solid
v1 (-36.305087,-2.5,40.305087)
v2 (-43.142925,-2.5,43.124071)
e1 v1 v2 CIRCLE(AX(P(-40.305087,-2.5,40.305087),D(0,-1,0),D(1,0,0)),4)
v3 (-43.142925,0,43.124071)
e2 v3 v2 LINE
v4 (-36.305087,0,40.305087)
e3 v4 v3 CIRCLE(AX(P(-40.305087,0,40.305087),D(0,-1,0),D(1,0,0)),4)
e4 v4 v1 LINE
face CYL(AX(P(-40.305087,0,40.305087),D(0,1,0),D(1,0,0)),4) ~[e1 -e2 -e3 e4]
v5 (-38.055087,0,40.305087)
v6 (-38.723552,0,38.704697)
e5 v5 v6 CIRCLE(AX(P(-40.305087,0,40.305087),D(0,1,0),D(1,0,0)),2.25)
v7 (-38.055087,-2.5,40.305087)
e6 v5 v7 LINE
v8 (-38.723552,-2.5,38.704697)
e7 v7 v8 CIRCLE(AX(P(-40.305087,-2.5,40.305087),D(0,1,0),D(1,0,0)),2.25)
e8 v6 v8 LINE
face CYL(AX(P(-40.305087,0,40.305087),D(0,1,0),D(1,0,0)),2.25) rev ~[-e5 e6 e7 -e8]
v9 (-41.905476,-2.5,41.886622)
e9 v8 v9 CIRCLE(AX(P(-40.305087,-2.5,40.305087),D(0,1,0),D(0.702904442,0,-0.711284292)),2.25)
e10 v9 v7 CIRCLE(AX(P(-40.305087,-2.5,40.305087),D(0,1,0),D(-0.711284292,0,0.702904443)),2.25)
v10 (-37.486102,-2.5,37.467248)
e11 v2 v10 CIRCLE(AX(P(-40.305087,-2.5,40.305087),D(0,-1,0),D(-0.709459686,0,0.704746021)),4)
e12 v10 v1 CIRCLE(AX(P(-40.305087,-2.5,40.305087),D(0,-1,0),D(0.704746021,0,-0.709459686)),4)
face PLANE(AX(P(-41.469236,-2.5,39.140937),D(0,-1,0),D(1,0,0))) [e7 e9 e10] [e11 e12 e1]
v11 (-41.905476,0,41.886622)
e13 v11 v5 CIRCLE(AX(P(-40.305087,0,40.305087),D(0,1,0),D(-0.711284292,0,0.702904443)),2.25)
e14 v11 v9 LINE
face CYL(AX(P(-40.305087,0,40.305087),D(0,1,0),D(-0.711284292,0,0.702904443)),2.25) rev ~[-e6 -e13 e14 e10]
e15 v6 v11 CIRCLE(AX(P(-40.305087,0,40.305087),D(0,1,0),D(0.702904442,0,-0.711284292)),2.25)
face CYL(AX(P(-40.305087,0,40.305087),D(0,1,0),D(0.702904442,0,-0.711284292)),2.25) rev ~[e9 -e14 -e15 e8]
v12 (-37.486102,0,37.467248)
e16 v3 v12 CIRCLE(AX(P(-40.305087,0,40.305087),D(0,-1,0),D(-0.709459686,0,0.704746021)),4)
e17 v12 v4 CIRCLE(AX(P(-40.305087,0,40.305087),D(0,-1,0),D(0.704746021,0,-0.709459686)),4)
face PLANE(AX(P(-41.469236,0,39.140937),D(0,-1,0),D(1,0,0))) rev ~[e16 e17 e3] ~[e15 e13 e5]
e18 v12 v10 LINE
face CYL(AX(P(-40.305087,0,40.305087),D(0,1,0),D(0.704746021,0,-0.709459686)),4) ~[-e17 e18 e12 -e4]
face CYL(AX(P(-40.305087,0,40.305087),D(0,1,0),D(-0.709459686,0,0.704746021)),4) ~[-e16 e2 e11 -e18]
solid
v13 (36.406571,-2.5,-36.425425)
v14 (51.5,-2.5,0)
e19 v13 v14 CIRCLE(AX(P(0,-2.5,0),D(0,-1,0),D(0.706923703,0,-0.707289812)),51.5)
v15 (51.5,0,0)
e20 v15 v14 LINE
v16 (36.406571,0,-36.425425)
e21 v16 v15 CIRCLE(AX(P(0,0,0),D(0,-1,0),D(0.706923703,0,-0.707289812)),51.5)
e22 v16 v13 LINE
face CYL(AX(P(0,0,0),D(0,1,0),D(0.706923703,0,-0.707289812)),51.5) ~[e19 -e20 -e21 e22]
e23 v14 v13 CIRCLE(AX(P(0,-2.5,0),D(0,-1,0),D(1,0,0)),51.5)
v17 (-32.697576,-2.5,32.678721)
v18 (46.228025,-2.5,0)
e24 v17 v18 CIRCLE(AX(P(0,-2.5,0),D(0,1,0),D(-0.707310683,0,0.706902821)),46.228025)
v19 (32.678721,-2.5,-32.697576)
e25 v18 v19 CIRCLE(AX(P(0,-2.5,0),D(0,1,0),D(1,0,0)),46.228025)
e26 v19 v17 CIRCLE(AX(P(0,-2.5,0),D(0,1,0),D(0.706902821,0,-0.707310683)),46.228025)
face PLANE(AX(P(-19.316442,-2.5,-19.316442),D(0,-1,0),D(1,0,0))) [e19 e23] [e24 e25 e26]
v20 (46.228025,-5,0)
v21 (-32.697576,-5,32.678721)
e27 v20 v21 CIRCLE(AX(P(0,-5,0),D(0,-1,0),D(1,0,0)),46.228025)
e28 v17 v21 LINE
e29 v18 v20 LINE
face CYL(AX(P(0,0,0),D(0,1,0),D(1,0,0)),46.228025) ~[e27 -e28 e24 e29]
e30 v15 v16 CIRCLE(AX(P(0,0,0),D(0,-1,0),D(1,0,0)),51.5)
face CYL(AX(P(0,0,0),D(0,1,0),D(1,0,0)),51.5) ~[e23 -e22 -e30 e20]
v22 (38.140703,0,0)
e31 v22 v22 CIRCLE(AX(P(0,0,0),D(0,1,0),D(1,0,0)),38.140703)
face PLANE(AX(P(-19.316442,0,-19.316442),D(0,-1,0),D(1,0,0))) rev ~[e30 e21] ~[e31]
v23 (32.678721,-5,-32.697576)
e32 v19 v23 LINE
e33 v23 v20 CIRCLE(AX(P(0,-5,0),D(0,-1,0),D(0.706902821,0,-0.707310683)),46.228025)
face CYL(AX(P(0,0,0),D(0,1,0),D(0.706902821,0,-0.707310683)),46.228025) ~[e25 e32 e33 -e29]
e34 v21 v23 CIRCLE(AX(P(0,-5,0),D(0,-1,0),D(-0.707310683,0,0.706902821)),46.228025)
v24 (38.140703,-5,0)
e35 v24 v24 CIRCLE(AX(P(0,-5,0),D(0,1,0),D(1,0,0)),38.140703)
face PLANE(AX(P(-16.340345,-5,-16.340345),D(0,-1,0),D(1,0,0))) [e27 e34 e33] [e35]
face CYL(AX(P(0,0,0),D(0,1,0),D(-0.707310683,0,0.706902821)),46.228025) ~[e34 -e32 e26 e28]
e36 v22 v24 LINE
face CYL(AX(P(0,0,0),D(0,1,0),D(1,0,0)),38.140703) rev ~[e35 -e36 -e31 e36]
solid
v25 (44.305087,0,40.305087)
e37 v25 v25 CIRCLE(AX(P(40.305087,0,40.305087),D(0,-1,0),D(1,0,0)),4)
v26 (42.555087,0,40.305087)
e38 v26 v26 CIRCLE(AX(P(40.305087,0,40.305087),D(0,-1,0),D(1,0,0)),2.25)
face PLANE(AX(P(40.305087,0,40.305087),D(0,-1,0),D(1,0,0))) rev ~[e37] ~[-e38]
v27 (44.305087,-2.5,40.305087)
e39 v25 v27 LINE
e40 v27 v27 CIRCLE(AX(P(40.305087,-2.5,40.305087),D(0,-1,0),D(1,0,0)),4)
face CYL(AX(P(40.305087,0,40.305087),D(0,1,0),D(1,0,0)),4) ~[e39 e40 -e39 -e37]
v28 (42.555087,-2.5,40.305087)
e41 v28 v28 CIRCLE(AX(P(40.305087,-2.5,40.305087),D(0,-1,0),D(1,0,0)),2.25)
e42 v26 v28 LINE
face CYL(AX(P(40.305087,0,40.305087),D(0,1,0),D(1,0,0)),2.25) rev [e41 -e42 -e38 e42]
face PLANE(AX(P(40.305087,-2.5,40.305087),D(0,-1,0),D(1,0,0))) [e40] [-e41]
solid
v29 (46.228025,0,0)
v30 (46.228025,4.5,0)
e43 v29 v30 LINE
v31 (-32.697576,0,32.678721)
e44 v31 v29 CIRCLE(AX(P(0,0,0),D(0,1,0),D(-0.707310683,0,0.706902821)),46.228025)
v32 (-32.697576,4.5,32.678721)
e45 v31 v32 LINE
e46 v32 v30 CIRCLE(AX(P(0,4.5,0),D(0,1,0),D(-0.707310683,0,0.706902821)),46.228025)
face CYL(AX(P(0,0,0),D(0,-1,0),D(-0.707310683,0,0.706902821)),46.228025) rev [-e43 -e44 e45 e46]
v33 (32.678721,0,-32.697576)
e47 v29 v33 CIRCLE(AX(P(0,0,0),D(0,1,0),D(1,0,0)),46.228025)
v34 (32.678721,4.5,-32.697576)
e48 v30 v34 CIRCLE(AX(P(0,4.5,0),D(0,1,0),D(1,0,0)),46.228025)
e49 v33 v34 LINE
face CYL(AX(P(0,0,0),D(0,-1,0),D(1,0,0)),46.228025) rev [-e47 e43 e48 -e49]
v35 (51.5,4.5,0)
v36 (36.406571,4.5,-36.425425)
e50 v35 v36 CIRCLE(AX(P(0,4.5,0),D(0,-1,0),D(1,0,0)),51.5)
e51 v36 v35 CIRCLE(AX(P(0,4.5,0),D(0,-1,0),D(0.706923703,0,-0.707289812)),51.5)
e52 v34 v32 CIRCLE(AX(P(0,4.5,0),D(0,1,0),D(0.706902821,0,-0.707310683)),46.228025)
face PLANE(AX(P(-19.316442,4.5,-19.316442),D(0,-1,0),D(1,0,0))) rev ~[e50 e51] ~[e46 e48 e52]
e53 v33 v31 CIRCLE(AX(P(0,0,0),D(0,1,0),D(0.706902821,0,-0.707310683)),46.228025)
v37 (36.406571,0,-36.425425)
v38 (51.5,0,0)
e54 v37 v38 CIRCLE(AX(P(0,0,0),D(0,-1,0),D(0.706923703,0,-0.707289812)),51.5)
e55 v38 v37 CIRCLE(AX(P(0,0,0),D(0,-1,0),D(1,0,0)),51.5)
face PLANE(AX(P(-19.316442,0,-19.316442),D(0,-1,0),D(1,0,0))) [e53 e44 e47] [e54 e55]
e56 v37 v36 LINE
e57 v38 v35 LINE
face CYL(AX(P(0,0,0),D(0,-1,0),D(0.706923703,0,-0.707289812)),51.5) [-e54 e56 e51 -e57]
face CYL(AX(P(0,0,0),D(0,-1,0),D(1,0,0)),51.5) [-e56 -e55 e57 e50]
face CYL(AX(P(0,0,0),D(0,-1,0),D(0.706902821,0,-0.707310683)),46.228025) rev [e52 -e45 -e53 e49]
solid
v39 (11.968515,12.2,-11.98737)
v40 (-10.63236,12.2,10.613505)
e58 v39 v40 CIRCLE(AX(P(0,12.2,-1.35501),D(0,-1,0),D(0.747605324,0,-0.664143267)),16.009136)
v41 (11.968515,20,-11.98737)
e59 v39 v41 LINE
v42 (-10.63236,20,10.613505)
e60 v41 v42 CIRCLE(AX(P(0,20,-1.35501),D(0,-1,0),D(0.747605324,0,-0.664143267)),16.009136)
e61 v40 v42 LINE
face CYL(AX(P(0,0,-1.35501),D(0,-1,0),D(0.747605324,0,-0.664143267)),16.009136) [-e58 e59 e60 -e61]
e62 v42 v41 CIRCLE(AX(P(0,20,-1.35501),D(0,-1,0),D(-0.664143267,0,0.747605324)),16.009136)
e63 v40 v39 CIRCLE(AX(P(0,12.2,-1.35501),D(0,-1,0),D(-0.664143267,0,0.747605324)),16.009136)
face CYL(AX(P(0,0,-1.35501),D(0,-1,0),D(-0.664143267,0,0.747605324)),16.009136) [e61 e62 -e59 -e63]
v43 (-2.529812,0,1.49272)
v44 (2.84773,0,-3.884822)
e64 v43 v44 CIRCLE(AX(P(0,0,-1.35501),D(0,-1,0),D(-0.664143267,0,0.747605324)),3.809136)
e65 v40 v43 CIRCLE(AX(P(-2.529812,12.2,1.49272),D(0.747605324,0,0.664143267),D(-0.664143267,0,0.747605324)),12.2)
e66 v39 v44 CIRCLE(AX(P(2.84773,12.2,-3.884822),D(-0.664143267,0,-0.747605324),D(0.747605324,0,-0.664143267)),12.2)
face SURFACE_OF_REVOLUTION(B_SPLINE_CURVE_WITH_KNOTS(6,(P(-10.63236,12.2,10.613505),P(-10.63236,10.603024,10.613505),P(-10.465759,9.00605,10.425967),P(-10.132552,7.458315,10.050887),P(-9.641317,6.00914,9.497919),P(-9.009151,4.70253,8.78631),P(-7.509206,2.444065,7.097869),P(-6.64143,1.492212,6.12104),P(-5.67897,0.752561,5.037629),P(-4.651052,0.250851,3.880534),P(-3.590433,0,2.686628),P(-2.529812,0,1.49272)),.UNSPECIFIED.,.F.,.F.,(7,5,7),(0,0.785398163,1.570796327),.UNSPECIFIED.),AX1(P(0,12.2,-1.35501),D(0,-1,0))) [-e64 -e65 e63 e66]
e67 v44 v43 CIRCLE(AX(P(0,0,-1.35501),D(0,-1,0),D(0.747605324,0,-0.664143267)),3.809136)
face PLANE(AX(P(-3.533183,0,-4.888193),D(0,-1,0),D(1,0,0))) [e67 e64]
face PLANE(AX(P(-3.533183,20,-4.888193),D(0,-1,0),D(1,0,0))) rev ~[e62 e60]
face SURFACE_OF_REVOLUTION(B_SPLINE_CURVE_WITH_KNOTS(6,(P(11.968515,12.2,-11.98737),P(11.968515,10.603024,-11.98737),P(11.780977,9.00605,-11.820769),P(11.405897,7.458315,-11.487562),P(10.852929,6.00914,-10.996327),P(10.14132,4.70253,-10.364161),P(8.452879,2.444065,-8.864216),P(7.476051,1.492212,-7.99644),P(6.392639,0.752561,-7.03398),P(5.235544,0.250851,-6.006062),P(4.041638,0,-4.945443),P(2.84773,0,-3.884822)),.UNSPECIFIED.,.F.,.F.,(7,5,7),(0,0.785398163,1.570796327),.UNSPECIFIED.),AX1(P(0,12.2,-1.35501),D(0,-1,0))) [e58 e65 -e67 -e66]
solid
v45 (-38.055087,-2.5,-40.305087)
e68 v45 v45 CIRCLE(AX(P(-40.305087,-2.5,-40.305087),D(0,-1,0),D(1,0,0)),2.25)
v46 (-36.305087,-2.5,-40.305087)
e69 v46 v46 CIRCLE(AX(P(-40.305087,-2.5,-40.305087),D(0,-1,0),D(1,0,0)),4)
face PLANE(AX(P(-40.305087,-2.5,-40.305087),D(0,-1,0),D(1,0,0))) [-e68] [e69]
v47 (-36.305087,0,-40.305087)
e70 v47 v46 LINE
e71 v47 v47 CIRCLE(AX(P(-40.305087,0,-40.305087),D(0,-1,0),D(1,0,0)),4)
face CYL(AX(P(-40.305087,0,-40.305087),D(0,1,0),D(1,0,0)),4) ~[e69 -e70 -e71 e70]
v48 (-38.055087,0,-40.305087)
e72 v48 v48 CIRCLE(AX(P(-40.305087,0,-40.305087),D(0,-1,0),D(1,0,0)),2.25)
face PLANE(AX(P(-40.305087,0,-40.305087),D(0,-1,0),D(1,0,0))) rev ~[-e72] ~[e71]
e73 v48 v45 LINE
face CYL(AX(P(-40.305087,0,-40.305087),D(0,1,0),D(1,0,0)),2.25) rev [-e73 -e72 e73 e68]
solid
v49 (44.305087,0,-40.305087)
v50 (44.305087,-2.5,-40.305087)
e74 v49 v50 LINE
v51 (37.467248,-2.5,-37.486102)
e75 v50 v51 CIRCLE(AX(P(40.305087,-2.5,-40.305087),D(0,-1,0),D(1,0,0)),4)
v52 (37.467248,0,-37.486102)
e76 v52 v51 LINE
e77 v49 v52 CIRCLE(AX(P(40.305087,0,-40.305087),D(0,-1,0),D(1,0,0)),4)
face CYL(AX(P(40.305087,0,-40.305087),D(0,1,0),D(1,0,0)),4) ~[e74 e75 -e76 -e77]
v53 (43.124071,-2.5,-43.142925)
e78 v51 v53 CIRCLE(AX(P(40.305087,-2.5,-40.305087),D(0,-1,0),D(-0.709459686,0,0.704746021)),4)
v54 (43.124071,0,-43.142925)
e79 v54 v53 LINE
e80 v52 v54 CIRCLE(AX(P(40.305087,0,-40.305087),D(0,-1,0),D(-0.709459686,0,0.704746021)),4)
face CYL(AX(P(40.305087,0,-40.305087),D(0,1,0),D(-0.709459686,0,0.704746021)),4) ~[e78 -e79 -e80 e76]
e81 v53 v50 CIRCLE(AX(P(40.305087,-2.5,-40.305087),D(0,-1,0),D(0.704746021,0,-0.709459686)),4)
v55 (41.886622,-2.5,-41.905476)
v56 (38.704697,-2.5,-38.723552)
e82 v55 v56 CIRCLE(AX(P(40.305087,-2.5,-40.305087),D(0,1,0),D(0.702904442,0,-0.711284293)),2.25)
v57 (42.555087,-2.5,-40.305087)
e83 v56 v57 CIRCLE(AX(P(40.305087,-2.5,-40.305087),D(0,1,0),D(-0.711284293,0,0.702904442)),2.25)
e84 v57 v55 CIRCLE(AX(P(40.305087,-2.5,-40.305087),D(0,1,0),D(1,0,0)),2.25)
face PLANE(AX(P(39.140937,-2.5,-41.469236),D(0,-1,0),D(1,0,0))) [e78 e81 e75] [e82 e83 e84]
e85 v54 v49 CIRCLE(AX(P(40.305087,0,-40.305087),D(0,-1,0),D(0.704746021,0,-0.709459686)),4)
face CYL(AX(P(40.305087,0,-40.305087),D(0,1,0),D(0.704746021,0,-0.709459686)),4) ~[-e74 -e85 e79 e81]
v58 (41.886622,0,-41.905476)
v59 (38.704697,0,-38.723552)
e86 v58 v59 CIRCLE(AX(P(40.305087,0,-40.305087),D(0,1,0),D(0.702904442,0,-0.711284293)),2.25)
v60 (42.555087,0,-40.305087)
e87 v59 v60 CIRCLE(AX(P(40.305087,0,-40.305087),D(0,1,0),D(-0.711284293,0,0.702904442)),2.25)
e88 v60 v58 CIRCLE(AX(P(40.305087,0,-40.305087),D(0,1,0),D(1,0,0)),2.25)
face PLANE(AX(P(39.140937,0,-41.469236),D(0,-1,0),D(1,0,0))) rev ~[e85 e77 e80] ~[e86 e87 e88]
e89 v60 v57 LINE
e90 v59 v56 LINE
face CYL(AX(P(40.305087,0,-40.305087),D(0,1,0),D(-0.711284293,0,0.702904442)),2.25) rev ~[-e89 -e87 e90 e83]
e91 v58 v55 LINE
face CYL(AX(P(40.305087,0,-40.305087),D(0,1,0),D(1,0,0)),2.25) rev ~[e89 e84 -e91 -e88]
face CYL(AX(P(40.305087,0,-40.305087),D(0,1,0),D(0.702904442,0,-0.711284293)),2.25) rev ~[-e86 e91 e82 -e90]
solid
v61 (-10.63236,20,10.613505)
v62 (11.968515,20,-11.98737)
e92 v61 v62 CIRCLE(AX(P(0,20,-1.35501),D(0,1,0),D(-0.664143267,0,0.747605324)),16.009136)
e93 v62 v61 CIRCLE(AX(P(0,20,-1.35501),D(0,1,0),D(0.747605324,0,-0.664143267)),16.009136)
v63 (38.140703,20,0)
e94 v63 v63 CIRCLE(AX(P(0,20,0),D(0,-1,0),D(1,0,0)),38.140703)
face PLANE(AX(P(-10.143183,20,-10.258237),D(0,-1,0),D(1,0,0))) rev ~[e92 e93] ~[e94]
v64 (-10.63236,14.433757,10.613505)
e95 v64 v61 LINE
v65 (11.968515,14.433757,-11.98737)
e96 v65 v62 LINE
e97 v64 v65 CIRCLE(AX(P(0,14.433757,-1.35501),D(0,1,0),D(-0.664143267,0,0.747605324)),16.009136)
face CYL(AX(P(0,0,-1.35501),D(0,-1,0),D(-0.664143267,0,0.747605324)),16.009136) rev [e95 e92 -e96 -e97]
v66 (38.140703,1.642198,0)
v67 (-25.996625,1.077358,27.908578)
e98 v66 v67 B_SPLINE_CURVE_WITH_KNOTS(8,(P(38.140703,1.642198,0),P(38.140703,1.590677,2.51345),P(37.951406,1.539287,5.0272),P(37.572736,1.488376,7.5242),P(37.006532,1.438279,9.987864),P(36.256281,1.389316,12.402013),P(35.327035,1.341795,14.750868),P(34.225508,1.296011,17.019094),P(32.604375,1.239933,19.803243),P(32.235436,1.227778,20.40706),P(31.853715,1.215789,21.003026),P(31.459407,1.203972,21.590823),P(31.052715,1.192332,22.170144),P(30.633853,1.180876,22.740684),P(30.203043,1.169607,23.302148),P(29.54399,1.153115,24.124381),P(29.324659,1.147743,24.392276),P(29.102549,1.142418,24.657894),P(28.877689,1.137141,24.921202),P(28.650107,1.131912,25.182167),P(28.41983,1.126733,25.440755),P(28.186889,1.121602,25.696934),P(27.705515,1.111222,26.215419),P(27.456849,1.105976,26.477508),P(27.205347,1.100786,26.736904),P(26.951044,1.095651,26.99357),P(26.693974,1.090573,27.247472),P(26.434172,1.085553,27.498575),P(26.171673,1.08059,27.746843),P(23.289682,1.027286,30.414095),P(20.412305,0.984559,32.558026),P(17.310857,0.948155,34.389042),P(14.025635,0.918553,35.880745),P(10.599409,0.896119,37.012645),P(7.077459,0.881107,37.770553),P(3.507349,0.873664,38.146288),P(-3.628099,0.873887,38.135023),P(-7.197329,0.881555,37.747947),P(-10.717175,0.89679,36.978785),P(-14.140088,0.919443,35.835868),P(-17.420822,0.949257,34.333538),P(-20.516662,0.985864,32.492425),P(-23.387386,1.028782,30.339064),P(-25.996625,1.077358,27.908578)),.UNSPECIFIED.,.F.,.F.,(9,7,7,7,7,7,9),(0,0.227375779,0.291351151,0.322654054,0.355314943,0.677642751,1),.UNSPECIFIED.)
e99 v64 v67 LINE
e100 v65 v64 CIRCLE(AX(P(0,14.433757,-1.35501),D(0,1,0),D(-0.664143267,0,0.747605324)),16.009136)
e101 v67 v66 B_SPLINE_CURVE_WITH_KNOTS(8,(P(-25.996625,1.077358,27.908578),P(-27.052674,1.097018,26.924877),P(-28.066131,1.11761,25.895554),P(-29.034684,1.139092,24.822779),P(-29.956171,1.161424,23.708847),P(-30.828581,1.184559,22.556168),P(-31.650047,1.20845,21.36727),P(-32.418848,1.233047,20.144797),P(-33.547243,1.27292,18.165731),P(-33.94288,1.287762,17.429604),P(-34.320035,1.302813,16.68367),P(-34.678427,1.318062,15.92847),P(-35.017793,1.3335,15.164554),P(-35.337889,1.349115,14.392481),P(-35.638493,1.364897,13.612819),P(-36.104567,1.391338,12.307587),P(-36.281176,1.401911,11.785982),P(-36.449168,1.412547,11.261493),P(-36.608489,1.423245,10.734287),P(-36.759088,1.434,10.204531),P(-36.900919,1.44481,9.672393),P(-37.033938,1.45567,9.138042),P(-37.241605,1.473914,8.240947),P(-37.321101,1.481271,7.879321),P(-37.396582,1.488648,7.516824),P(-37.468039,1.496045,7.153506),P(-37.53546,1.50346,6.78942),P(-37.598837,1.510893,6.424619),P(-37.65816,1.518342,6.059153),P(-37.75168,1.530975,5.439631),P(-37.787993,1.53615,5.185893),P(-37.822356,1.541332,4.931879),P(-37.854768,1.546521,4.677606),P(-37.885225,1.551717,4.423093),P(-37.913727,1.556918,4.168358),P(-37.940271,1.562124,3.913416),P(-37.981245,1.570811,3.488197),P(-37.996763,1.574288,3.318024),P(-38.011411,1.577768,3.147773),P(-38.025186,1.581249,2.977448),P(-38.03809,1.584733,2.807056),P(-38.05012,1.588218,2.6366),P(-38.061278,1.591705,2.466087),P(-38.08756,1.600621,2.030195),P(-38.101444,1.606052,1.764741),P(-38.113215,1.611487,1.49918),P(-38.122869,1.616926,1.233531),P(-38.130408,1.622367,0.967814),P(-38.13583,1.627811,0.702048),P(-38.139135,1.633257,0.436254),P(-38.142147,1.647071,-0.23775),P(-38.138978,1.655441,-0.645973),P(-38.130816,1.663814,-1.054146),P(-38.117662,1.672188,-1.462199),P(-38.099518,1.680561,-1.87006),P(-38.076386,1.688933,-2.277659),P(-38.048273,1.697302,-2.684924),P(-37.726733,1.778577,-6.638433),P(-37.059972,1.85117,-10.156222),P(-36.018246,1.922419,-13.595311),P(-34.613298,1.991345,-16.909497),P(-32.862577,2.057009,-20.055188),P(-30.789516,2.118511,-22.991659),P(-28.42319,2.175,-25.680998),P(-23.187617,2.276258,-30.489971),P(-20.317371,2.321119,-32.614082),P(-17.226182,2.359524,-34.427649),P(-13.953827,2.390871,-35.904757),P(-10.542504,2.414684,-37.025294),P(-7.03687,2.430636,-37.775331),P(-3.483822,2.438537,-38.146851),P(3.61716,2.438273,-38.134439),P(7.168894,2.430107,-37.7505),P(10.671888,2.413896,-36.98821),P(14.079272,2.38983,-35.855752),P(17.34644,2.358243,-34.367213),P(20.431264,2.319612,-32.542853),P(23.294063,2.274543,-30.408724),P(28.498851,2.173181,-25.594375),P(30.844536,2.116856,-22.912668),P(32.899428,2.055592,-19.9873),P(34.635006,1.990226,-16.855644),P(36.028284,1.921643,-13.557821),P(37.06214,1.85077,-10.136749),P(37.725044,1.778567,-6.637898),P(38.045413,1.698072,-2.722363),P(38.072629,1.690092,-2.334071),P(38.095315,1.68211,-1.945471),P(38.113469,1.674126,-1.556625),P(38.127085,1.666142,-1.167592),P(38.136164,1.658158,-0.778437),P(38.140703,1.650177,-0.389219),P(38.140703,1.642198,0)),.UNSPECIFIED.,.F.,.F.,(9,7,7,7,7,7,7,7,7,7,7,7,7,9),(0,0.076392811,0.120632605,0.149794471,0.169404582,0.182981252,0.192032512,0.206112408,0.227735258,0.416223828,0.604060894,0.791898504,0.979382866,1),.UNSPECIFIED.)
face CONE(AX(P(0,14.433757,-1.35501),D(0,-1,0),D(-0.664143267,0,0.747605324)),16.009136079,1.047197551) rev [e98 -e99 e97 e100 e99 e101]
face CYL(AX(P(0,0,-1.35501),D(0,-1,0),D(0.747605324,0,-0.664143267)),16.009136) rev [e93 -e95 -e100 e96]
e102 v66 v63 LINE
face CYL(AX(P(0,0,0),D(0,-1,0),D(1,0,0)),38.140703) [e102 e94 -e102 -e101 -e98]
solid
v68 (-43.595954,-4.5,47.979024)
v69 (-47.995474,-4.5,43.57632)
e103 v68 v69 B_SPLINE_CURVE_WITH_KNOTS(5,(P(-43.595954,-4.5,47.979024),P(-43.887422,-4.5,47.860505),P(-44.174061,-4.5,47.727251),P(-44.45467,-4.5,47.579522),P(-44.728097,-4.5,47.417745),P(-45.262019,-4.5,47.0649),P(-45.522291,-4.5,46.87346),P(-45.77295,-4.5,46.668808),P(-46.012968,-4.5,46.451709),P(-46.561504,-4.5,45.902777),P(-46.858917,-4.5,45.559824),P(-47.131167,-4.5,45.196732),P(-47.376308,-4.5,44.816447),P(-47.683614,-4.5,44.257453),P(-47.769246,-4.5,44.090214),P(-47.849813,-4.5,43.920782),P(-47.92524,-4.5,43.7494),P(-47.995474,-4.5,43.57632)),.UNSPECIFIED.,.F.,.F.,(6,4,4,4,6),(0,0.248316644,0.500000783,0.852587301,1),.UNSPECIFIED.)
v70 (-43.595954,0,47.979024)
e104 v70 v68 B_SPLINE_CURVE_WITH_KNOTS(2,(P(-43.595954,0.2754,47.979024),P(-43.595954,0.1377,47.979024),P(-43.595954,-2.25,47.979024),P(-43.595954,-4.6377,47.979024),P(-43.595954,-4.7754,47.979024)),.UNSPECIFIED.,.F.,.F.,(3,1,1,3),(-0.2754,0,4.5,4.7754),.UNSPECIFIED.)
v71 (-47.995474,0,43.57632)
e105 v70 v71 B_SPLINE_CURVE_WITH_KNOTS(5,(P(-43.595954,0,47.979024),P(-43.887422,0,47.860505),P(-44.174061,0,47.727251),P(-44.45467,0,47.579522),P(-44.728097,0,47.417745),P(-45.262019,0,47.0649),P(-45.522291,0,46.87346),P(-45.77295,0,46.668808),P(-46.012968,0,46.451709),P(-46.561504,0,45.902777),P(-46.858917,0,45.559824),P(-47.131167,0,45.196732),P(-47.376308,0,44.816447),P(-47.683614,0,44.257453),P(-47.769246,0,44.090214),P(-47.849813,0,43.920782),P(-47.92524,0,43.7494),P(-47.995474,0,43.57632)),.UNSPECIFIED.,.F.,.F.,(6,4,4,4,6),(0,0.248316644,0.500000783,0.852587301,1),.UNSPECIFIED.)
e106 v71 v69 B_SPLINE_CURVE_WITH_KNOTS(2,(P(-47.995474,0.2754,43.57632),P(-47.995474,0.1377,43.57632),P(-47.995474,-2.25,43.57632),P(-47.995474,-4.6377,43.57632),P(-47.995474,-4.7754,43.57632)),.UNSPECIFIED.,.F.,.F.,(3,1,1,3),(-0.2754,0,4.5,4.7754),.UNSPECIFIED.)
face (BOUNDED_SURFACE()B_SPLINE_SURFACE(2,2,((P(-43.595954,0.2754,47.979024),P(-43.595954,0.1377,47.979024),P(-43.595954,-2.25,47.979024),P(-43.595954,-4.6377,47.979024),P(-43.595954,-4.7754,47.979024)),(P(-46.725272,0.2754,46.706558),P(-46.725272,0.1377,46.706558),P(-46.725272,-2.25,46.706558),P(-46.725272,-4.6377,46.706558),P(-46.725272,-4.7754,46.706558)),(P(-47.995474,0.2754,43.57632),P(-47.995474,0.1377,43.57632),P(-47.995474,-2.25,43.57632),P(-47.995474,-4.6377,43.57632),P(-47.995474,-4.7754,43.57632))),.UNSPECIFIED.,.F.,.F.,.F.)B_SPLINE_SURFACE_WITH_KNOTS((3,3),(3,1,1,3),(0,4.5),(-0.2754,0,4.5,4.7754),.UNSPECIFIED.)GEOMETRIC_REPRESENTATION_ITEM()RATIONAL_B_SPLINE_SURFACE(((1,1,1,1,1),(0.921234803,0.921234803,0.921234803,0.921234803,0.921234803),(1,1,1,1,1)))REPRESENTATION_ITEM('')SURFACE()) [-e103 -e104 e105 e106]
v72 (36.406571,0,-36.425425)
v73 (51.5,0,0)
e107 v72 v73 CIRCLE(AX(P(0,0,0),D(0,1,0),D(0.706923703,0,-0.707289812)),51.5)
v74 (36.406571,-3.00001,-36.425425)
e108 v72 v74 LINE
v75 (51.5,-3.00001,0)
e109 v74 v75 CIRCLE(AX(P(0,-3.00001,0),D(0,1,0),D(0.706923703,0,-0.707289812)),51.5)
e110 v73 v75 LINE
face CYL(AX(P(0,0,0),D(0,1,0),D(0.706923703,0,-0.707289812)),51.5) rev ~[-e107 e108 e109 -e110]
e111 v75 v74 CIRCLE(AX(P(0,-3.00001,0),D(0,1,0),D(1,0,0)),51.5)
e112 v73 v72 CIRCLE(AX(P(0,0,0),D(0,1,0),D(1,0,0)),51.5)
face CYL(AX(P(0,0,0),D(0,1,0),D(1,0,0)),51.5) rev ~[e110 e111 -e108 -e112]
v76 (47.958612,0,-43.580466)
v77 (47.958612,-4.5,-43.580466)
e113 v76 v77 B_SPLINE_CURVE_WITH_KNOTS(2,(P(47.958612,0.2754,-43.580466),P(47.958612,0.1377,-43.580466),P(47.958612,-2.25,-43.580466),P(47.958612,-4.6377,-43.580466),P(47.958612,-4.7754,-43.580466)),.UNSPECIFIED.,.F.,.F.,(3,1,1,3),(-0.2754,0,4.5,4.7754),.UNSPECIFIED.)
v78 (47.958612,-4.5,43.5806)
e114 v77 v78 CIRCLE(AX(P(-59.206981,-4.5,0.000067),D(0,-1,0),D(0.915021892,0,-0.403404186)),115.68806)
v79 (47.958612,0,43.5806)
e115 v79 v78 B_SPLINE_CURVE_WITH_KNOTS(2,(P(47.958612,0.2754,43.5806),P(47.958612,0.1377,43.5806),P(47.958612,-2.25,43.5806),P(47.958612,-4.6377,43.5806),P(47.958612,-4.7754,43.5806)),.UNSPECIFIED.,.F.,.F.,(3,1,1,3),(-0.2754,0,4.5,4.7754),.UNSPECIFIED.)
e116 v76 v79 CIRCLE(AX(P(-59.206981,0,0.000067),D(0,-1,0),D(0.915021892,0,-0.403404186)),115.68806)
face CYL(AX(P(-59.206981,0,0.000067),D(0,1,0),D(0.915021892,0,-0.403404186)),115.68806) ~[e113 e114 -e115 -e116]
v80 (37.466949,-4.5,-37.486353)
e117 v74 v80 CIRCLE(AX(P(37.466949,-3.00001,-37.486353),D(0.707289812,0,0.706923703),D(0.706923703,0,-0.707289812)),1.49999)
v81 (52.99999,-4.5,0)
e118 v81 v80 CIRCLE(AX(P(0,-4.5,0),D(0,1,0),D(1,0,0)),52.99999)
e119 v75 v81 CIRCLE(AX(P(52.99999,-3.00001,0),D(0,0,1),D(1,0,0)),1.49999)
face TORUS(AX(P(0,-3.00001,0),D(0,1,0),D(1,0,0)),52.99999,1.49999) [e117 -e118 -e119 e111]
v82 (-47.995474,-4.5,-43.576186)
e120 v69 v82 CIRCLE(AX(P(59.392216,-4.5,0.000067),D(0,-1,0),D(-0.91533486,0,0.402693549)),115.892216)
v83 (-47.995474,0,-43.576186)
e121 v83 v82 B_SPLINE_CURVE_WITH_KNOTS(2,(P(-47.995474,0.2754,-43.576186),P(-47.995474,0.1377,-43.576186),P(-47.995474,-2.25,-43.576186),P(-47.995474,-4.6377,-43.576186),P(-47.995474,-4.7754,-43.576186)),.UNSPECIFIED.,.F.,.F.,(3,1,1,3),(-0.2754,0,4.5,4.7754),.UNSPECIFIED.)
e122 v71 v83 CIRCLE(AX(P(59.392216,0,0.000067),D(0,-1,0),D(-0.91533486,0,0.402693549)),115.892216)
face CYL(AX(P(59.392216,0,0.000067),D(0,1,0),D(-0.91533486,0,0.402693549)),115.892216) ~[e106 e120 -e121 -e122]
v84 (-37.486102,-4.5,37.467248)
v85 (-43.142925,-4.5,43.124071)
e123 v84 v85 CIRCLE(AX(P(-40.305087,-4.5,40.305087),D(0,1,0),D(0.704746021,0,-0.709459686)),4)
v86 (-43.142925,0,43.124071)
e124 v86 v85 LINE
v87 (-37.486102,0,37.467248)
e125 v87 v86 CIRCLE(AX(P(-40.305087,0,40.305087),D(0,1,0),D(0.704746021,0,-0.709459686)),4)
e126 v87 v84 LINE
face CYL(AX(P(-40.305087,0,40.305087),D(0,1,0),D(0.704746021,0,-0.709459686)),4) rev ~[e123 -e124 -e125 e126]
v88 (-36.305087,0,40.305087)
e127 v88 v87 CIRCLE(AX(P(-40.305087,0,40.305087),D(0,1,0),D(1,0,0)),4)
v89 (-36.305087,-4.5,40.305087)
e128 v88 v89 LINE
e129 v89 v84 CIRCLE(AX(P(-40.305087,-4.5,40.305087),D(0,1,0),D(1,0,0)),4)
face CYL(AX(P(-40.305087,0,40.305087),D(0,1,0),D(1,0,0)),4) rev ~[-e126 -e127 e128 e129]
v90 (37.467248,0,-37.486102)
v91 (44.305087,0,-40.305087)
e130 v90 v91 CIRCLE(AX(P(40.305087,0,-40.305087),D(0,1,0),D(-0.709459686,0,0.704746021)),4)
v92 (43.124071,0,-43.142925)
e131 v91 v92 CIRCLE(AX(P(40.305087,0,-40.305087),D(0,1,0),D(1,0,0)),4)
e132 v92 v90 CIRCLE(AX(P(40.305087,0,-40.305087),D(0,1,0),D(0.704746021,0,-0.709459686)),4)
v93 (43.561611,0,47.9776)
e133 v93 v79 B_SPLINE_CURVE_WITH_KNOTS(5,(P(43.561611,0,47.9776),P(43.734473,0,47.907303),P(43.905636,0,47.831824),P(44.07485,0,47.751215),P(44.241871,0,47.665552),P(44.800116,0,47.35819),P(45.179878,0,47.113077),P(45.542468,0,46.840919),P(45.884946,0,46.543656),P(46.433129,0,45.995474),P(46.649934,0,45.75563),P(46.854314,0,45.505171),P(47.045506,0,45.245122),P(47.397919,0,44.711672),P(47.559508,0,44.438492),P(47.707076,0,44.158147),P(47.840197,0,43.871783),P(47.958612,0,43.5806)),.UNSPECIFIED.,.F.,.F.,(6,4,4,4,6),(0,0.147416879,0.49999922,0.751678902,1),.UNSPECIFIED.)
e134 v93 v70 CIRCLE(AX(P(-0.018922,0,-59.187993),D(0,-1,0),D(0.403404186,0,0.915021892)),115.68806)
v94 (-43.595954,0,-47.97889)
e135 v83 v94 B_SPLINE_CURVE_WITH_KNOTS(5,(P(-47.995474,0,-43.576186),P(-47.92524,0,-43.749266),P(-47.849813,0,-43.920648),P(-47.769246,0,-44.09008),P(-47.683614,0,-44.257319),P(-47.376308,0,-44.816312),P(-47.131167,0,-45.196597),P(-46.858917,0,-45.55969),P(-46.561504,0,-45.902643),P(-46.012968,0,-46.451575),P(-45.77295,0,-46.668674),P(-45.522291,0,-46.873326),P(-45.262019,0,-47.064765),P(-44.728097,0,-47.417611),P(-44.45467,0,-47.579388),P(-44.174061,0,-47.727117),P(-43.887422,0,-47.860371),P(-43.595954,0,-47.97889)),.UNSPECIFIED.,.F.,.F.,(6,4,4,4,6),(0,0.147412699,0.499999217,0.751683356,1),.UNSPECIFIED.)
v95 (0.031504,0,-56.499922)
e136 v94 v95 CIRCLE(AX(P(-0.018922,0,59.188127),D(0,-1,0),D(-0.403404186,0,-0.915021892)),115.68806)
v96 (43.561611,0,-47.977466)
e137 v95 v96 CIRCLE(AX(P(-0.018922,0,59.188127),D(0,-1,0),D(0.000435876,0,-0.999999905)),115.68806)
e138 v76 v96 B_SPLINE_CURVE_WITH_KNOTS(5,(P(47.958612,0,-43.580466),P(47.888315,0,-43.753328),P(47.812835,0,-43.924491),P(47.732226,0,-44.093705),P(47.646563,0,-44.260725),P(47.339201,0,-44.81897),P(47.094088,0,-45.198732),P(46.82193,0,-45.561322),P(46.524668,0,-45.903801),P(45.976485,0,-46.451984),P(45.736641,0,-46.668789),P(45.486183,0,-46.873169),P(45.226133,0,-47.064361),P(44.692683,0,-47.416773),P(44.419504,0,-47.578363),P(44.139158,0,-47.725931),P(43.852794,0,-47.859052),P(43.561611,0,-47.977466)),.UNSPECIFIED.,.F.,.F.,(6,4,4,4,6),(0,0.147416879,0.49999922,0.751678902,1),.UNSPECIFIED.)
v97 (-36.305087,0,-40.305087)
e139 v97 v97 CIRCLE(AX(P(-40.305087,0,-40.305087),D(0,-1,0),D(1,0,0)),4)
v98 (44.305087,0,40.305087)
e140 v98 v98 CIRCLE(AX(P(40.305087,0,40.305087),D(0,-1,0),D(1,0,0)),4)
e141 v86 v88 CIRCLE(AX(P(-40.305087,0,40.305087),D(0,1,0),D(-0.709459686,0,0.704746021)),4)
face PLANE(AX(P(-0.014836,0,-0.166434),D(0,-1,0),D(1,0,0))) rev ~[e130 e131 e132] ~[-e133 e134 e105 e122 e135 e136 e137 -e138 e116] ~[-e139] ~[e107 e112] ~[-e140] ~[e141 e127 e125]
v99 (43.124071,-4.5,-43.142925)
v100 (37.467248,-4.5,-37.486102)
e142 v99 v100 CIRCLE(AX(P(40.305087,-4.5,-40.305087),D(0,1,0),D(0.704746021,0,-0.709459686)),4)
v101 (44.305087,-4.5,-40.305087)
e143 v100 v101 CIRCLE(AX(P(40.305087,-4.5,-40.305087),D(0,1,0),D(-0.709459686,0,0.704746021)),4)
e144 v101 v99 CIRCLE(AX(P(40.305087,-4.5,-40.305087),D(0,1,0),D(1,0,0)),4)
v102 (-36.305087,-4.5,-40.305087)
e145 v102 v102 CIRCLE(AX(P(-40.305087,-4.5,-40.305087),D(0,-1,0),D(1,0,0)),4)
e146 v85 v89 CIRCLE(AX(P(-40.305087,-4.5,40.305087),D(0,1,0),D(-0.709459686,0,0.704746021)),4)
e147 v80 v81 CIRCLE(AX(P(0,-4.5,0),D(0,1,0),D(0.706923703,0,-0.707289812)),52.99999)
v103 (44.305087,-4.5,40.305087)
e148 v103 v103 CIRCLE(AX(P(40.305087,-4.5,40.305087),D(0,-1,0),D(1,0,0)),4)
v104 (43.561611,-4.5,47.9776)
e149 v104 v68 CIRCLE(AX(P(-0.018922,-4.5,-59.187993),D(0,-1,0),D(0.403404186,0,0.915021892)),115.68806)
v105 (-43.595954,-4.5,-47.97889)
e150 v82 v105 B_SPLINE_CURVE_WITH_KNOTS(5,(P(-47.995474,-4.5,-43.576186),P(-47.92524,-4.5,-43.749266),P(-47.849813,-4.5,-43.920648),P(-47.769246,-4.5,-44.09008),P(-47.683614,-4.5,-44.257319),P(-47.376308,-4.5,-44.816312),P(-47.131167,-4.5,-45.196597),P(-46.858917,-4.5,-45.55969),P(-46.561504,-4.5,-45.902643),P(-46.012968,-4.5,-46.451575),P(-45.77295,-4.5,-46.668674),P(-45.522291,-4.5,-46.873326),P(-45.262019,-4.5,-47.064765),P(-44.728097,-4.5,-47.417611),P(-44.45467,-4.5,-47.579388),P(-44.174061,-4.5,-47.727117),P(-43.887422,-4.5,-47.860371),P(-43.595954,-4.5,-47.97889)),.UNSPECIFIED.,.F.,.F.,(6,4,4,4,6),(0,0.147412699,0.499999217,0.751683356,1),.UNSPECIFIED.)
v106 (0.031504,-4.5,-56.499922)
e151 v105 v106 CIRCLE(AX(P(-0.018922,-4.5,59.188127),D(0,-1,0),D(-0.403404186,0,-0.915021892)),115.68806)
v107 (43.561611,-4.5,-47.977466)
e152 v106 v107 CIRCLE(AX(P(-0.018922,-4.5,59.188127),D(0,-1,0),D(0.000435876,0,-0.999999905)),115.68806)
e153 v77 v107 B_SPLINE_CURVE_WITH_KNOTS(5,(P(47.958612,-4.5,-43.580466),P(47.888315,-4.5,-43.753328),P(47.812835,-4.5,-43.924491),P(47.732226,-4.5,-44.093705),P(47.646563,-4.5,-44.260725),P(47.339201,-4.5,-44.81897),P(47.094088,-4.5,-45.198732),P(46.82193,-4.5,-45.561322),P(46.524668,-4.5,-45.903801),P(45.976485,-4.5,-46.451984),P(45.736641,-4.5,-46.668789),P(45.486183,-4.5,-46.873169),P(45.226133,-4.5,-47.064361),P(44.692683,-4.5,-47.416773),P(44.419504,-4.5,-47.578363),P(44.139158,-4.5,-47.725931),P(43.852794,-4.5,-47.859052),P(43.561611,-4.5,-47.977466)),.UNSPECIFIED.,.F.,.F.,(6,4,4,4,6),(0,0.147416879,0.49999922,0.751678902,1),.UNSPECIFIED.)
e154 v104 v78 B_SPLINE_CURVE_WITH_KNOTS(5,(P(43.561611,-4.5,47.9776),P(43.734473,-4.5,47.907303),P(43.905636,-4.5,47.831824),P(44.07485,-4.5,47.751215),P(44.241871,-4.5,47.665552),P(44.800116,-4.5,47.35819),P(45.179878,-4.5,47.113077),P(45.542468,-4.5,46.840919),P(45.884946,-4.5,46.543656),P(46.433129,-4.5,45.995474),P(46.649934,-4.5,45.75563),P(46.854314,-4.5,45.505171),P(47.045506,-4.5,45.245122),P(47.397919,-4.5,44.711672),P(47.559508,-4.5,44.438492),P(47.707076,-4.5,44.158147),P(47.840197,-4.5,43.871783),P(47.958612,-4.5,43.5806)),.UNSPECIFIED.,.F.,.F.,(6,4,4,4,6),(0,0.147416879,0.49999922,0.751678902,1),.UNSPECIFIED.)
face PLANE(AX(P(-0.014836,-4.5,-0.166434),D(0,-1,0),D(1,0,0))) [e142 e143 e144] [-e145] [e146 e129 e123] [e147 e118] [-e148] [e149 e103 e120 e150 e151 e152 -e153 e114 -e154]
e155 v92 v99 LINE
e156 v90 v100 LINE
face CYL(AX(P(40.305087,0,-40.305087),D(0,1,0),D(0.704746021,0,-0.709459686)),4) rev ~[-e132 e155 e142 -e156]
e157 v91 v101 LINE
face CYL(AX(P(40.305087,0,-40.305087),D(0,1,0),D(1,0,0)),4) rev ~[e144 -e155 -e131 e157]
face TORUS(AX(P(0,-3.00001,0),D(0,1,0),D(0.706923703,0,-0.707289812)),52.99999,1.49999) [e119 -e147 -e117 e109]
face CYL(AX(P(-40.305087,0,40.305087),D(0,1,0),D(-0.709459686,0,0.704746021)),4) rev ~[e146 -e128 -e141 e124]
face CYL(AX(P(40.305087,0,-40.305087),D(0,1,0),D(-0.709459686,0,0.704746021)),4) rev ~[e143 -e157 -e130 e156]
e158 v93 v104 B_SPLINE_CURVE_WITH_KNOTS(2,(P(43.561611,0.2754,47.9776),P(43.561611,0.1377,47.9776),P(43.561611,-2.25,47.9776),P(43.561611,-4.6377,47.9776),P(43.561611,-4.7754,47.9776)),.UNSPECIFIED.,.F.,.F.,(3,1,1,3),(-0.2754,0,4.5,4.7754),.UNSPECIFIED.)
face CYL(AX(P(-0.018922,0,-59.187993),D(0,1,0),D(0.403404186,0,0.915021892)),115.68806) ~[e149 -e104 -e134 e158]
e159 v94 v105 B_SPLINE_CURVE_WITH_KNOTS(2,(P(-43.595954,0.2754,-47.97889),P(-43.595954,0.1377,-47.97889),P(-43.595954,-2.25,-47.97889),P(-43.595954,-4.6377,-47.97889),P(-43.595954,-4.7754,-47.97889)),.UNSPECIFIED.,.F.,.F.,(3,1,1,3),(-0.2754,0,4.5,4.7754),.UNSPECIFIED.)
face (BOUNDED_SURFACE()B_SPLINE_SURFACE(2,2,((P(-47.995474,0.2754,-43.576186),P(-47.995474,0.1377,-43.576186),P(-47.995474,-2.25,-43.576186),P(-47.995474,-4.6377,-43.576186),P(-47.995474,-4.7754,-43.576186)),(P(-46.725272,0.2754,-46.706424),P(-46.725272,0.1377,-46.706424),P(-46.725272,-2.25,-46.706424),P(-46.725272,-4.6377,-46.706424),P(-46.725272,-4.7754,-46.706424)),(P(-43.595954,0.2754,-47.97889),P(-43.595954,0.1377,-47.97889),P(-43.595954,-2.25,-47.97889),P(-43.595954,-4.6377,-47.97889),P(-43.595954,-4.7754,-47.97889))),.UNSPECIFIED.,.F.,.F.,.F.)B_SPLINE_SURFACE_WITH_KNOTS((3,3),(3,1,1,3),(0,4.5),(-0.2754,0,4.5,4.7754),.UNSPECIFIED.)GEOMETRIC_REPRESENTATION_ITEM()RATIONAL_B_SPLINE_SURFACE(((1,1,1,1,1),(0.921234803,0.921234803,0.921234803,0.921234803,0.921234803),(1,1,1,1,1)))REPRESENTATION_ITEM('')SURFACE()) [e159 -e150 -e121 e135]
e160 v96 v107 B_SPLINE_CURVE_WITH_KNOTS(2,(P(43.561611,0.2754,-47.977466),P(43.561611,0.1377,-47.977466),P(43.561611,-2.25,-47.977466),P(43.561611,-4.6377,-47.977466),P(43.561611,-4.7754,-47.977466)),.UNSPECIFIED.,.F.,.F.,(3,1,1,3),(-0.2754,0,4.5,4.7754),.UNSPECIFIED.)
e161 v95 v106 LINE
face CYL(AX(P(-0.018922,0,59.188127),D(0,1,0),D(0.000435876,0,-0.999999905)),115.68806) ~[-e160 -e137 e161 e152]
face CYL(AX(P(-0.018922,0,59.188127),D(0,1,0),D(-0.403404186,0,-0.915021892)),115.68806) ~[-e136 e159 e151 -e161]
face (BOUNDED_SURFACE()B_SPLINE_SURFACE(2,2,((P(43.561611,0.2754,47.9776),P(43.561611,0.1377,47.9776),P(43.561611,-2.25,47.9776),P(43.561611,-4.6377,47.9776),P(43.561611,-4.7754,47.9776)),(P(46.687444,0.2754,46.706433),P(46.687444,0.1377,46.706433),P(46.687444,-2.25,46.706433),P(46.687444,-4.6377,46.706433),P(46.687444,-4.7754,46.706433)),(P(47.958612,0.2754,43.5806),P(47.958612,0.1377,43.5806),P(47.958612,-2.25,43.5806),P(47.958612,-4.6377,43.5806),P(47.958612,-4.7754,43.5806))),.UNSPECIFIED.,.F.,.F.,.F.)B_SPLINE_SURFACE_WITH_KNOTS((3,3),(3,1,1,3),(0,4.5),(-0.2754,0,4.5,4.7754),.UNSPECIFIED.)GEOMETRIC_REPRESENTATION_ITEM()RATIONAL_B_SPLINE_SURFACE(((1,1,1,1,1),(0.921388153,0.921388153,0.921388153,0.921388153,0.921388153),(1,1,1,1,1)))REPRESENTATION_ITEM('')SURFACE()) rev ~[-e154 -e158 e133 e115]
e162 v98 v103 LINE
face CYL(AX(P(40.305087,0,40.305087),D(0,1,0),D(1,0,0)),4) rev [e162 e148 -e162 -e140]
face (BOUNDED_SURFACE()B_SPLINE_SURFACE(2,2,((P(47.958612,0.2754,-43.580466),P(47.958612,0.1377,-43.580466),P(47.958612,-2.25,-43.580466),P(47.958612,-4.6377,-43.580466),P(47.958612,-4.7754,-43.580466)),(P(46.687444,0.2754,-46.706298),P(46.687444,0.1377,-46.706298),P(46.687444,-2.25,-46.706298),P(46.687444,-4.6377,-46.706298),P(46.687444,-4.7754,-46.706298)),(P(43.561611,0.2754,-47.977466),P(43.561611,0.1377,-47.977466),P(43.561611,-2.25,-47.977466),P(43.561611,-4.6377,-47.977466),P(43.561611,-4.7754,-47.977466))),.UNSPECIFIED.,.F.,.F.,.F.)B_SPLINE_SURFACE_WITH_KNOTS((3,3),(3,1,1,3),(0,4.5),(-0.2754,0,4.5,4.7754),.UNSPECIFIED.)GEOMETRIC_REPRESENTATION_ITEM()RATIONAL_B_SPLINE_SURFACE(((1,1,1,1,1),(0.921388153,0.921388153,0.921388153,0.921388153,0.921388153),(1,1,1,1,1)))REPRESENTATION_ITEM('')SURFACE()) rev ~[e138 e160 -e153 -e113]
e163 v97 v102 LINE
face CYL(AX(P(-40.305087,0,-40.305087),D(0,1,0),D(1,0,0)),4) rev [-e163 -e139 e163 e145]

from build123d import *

# Parameters (mm, degrees)
F0_R     = 4
F1_DEPTH = 4.5
F2_R     = 1.49999
F3_DEPTH = 4.5
F4_DEPTH = 2.5
F5_DEPTH = 5
F6_DEPTH = 20
F8_DEPTH = 20
F9_DEPTH = 2.5
F0_R_2   = 2.25
F10_R    = 12.2
F11_R    = 8


# Not quite as in the source:
# - a fillet or chamfer that OpenCascade refuses, or shapes differently, is made with other operations: its cross-section is extruded or revolved along the edge and cut away or added
# - a fillet or chamfer is up to 0.001 mm smaller than in the source, because OpenCascade refuses the exact size


with BuildPart() as f1:
    # F0 (on Front) → F1 (new body)
    with BuildSketch(Plane.XZ):
        with BuildLine():
            ThreePointArc((46.6501257851, 46.6691146691), (-0.0189217732, 56.5000671107), (-46.6879693315, 46.6691146691))
            ThreePointArc((-46.6879693315, 46.6691146691), (-56.5, 6.71107e-05), (-46.6879693315, -46.6689804476))
            ThreePointArc((-46.6879693315, -46.6689804476), (-23.840882854, -54.0207126295), (0.0315038717, -56.4999218996))
            ThreePointArc((0.0315038717, -56.4999218996), (23.852382057, -54.010318455), (46.6501257851, -46.6689804476))
            ThreePointArc((46.6501257851, -46.6689804476), (56.4810782268, 6.71107e-05), (46.6501257851, 46.6691146691))
        make_face()
        with Locations((-40.3050865276, -40.3050865276)):
            Circle(F0_R, mode=Mode.SUBTRACT)
        with BuildLine():
            ThreePointArc((43.1240706101, -43.1429252727), (37.4766594029, -43.1335136524), (37.4672477826, -37.4861024452))
            ThreePointArc((37.4672477826, -37.4861024452), (41.8296594219, -36.6070225084), (44.3050865276, -40.3050865276))
            ThreePointArc((44.3050865276, -40.3050865276), (43.9980485048, -41.8419768409), (43.1240706101, -43.1429252727))
        make_face(mode=Mode.SUBTRACT)
        with BuildLine():
            ThreePointArc((-36.4254253421, 36.4065706796), (19.7020379007, 47.5823465432), (51.5, 0))
            ThreePointArc((51.5, 0), (47.5772445083, -19.7143553027), (36.4065706795, -36.4254253421))
            ThreePointArc((36.4065706795, -36.4254253421), (-36.4159992311, -36.4159992311), (-36.4254253421, 36.4065706796))
        make_face(mode=Mode.SUBTRACT)
        with BuildLine():
            ThreePointArc((-36.3050865276, 40.3050865276), (-36.6121245504, 38.7681962144), (-37.4861024451, 37.4672477827))
            ThreePointArc((-37.4861024451, 37.4672477827), (-43.1335136524, 37.4766594029), (-43.1429252726, 43.1240706102))
            ThreePointArc((-43.1429252726, 43.1240706102), (-38.7805136333, 44.0031505468), (-36.3050865276, 40.3050865276))
        make_face(mode=Mode.SUBTRACT)
        with Locations((40.3050865276, 40.3050865276)):
            Circle(F0_R, mode=Mode.SUBTRACT)
    extrude(amount=F1_DEPTH)

    # F2 (radius 1.5 in the source; OpenCascade refuses exactly that, so slightly less here)
    f2_edges = [f1.edges().sort_by_distance(p)[0] for p in [
        (-51.5, -4.5, 0),
    ]]
    fillet(f2_edges, radius=F2_R)

    # F11
    f11_edges = [f1.edges().sort_by_distance(p)[0] for p in [
        (-46.687969, -2.25, 46.669115),
        (46.650126, -2.25, 46.669115),
        (46.650126, -2.25, -46.66898),
        (-46.687969, -2.25, -46.66898),
    ]]
    fillet(f11_edges, radius=F11_R)


with BuildPart() as f3:
    # F0 (on Front) → F3 (new body)
    with BuildSketch(Plane.XZ):
        with BuildLine():
            Line((-32.6975760945, 32.678721432), (-36.4254253421, 36.4065706796))
            ThreePointArc((-36.4254253421, 36.4065706796), (-36.4159992311, -36.4159992311), (36.4065706795, -36.4254253421))
            Line((36.4065706795, -36.4254253421), (32.6787214319, -32.6975760945))
            ThreePointArc((32.6787214319, -32.6975760945), (-32.6881501227, -32.6881501226), (-32.6975760945, 32.678721432))
        make_face()
        with BuildLine():
            ThreePointArc((36.4065706795, -36.4254253421), (47.5772445083, -19.7143553027), (51.5, 0))
            ThreePointArc((51.5, 0), (19.7020379007, 47.5823465432), (-36.4254253421, 36.4065706796))
            Line((-36.4254253421, 36.4065706796), (-32.6975760945, 32.678721432))
            ThreePointArc((-32.6975760945, 32.678721432), (17.6845404825, 42.711676914), (46.2280252324, 0))
            ThreePointArc((46.2280252324, 0), (42.7065748791, -17.6968578845), (32.6787214319, -32.6975760945))
            Line((32.6787214319, -32.6975760945), (36.4065706795, -36.4254253421))
        make_face()
    extrude(amount=-F3_DEPTH)


with BuildPart() as f4:
    # F0 (on Front) → F4 (new body)
    with BuildSketch(Plane.XZ):
        with BuildLine():
            Line((-32.6975760945, 32.678721432), (-36.4254253421, 36.4065706796))
            ThreePointArc((-36.4254253421, 36.4065706796), (-36.4159992311, -36.4159992311), (36.4065706795, -36.4254253421))
            Line((36.4065706795, -36.4254253421), (32.6787214319, -32.6975760945))
            ThreePointArc((32.6787214319, -32.6975760945), (-32.6881501227, -32.6881501226), (-32.6975760945, 32.678721432))
        make_face()
        with BuildLine():
            ThreePointArc((36.4065706795, -36.4254253421), (47.5772445083, -19.7143553027), (51.5, 0))
            ThreePointArc((51.5, 0), (19.7020379007, 47.5823465432), (-36.4254253421, 36.4065706796))
            Line((-36.4254253421, 36.4065706796), (-32.6975760945, 32.678721432))
            ThreePointArc((-32.6975760945, 32.678721432), (17.6845404825, 42.711676914), (46.2280252324, 0))
            ThreePointArc((46.2280252324, 0), (42.7065748791, -17.6968578845), (32.6787214319, -32.6975760945))
            Line((32.6787214319, -32.6975760945), (36.4065706795, -36.4254253421))
        make_face()
    extrude(amount=F4_DEPTH)

    # F0 (on Front) → F5 (join)
    with BuildSketch(Plane.XZ):
        with BuildLine():
            Line((-26.9789756853, 26.9601210229), (-32.6975760945, 32.678721432))
            ThreePointArc((-32.6975760945, 32.678721432), (-32.6881501227, -32.6881501226), (32.6787214319, -32.6975760945))
            Line((32.6787214319, -32.6975760945), (26.9601210228, -26.9789756854))
            ThreePointArc((26.9601210228, -26.9789756854), (-26.9695500018, -26.9695500018), (-26.9789756853, 26.9601210229))
        make_face()
        with BuildLine():
            ThreePointArc((46.2280252324, 0), (17.6845404825, 42.711676914), (-32.6975760945, 32.678721432))
            Line((-32.6975760945, 32.678721432), (-26.9789756853, 26.9601210229))
            ThreePointArc((-26.9789756853, 26.9601210229), (14.5896563597, 35.239965691), (38.1407033836, 0))
            ThreePointArc((38.1407033836, 0), (35.234863656, -14.6019737618), (26.9601210228, -26.9789756854))
            Line((26.9601210228, -26.9789756854), (32.6787214319, -32.6975760945))
            ThreePointArc((32.6787214319, -32.6975760945), (42.7065748791, -17.6968578845), (46.2280252324, 0))
        make_face()
    extrude(amount=F5_DEPTH)


with BuildPart() as f6:
    # F0 (on Front) → F6 (new body)
    with BuildSketch(Plane.XZ):
        with BuildLine():
            Line((-10.6323599426, 10.6135052801), (-26.9789756853, 26.9601210229))
            ThreePointArc((-26.9789756853, 26.9601210229), (-26.9695500018, -26.9695500018), (26.9601210228, -26.9789756854))
            Line((26.9601210228, -26.9789756854), (11.9685153649, -11.9873700274))
            ThreePointArc((11.9685153649, -11.9873700274), (-11.3201686822, -12.675178767), (-10.6323599426, 10.6135052801))
        make_face()
        with BuildLine():
            ThreePointArc((38.1407033836, 0), (14.5896563597, 35.239965691), (-26.9789756853, 26.9601210229))
            Line((-26.9789756853, 26.9601210229), (-10.6323599426, 10.6135052801))
            ThreePointArc((-10.6323599426, 10.6135052801), (6.5603940746, 13.2481973565), (16.0091360787, -1.3550100848))
            ThreePointArc((16.0091360787, -1.3550100848), (14.9649261462, -7.0421379562), (11.9685153649, -11.9873700274))
            Line((11.9685153649, -11.9873700274), (26.9601210228, -26.9789756854))
            ThreePointArc((26.9601210228, -26.9789756854), (35.234863656, -14.6019737618), (38.1407033836, 0))
        make_face()
    extrude(amount=-F6_DEPTH)

    # F7: chamfer of 25 x 14.4337567297 on 1 edges, made by hand

    # F7_s1 → F7_t2 (revolve, cut)
    with BuildSketch(Plane(origin=(-0.6727855999, 0, -0.5976763571), x_dir=(0, 1, 0), z_dir=(-0.747605324, 0, -0.6641432673))):
        Polygon((14.4337567297, -14.9961233253), (0, -39.9961233253), (0, -14.9961233253), align=None)
    revolve(axis=Axis((0, 0, -1.3550100848), (0, 1, 0)), mode=Mode.SUBTRACT)


with BuildPart() as f8:
    # F0 (on Front) → F8 (new body)
    with BuildSketch(Plane.XZ):
        with BuildLine():
            Line((11.9685153649, -11.9873700274), (-10.6323599426, 10.6135052801))
            ThreePointArc((-10.6323599426, 10.6135052801), (-11.3201686822, -12.675178767), (11.9685153649, -11.9873700274))
        make_face()
        with BuildLine():
            ThreePointArc((16.0091360787, -1.3550100848), (6.5603940746, 13.2481973565), (-10.6323599426, 10.6135052801))
            Line((-10.6323599426, 10.6135052801), (11.9685153649, -11.9873700274))
            ThreePointArc((11.9685153649, -11.9873700274), (14.9649261462, -7.0421379562), (16.0091360787, -1.3550100848))
        make_face()
    extrude(amount=-F8_DEPTH)

    # F10
    f10_edges = [f8.edges().sort_by_distance(p)[0] for p in [
        (-11.968515, 0, 9.27735),
    ]]
    fillet(f10_edges, radius=F10_R)


with BuildPart() as f9:
    # F0 (on Front) → F9 (new body)
    with BuildSketch(Plane.XZ):
        with BuildLine():
            ThreePointArc((-43.1429252726, 43.1240706102), (-43.1335136524, 37.4766594029), (-37.4861024451, 37.4672477827))
            Line((-37.4861024451, 37.4672477827), (-38.723551532, 38.7046968696))
            ThreePointArc((-38.723551532, 38.7046968696), (-41.8960767853, 38.71409627), (-41.9054761857, 41.8866215233))
            Line((-41.9054761857, 41.8866215233), (-43.1429252726, 43.1240706102))
        make_face()
        with BuildLine():
            Line((-38.723551532, 38.7046968696), (-37.4861024451, 37.4672477827))
            ThreePointArc((-37.4861024451, 37.4672477827), (-36.6121245504, 38.7681962144), (-36.3050865276, 40.3050865276))
            ThreePointArc((-36.3050865276, 40.3050865276), (-38.7805136333, 44.0031505468), (-43.1429252726, 43.1240706102))
            Line((-43.1429252726, 43.1240706102), (-41.9054761857, 41.8866215233))
            ThreePointArc((-41.9054761857, 41.8866215233), (-39.4502113118, 42.3863573811), (-38.0550865276, 40.3050865276))
            ThreePointArc((-38.0550865276, 40.3050865276), (-38.2289177315, 39.4378938559), (-38.723551532, 38.7046968696))
        make_face()
    extrude(amount=F9_DEPTH)


with BuildPart() as f9b:
    # F0 (on Front) → F9, piece 2 (new body)
    with BuildSketch(Plane.XZ):
        with Locations((40.3050865276, 40.3050865276)):
            Circle(F0_R)
        with Locations((40.3050865276, 40.3050865276)):
            Circle(F0_R_2, mode=Mode.SUBTRACT)
    extrude(amount=F9_DEPTH)


with BuildPart() as f9c:
    # F0 (on Front) → F9, piece 3 (new body)
    with BuildSketch(Plane.XZ):
        with Locations((-40.3050865276, -40.3050865276)):
            Circle(F0_R)
        with Locations((-40.3050865276, -40.3050865276)):
            Circle(F0_R_2, mode=Mode.SUBTRACT)
    extrude(amount=F9_DEPTH)


with BuildPart() as f9d:
    # F0 (on Front) → F9, piece 4 (new body)
    with BuildSketch(Plane.XZ):
        with BuildLine():
            Line((38.7046968695, -38.7235515321), (37.4672477826, -37.4861024452))
            ThreePointArc((37.4672477826, -37.4861024452), (37.4766594029, -43.1335136524), (43.1240706101, -43.1429252727))
            Line((43.1240706101, -43.1429252727), (41.8866215232, -41.9054761858))
            ThreePointArc((41.8866215232, -41.9054761858), (38.71409627, -41.8960767853), (38.7046968695, -38.7235515321))
        make_face()
        with BuildLine():
            ThreePointArc((44.3050865276, -40.3050865276), (41.8296594219, -36.6070225084), (37.4672477826, -37.4861024452))
            Line((37.4672477826, -37.4861024452), (38.7046968695, -38.7235515321))
            ThreePointArc((38.7046968695, -38.7235515321), (41.1599617434, -38.2238156742), (42.5550865276, -40.3050865276))
            ThreePointArc((42.5550865276, -40.3050865276), (42.3812553238, -41.1722791994), (41.8866215232, -41.9054761858))
            Line((41.8866215232, -41.9054761858), (43.1240706101, -43.1429252727))
            ThreePointArc((43.1240706101, -43.1429252727), (43.9980485048, -41.8419768409), (44.3050865276, -40.3050865276))
        make_face()
    extrude(amount=F9_DEPTH)


solid = Compound([f1.part, f3.part, f4.part, f6.part, f8.part, f9.part, f9b.part, f9c.part, f9d.part])
